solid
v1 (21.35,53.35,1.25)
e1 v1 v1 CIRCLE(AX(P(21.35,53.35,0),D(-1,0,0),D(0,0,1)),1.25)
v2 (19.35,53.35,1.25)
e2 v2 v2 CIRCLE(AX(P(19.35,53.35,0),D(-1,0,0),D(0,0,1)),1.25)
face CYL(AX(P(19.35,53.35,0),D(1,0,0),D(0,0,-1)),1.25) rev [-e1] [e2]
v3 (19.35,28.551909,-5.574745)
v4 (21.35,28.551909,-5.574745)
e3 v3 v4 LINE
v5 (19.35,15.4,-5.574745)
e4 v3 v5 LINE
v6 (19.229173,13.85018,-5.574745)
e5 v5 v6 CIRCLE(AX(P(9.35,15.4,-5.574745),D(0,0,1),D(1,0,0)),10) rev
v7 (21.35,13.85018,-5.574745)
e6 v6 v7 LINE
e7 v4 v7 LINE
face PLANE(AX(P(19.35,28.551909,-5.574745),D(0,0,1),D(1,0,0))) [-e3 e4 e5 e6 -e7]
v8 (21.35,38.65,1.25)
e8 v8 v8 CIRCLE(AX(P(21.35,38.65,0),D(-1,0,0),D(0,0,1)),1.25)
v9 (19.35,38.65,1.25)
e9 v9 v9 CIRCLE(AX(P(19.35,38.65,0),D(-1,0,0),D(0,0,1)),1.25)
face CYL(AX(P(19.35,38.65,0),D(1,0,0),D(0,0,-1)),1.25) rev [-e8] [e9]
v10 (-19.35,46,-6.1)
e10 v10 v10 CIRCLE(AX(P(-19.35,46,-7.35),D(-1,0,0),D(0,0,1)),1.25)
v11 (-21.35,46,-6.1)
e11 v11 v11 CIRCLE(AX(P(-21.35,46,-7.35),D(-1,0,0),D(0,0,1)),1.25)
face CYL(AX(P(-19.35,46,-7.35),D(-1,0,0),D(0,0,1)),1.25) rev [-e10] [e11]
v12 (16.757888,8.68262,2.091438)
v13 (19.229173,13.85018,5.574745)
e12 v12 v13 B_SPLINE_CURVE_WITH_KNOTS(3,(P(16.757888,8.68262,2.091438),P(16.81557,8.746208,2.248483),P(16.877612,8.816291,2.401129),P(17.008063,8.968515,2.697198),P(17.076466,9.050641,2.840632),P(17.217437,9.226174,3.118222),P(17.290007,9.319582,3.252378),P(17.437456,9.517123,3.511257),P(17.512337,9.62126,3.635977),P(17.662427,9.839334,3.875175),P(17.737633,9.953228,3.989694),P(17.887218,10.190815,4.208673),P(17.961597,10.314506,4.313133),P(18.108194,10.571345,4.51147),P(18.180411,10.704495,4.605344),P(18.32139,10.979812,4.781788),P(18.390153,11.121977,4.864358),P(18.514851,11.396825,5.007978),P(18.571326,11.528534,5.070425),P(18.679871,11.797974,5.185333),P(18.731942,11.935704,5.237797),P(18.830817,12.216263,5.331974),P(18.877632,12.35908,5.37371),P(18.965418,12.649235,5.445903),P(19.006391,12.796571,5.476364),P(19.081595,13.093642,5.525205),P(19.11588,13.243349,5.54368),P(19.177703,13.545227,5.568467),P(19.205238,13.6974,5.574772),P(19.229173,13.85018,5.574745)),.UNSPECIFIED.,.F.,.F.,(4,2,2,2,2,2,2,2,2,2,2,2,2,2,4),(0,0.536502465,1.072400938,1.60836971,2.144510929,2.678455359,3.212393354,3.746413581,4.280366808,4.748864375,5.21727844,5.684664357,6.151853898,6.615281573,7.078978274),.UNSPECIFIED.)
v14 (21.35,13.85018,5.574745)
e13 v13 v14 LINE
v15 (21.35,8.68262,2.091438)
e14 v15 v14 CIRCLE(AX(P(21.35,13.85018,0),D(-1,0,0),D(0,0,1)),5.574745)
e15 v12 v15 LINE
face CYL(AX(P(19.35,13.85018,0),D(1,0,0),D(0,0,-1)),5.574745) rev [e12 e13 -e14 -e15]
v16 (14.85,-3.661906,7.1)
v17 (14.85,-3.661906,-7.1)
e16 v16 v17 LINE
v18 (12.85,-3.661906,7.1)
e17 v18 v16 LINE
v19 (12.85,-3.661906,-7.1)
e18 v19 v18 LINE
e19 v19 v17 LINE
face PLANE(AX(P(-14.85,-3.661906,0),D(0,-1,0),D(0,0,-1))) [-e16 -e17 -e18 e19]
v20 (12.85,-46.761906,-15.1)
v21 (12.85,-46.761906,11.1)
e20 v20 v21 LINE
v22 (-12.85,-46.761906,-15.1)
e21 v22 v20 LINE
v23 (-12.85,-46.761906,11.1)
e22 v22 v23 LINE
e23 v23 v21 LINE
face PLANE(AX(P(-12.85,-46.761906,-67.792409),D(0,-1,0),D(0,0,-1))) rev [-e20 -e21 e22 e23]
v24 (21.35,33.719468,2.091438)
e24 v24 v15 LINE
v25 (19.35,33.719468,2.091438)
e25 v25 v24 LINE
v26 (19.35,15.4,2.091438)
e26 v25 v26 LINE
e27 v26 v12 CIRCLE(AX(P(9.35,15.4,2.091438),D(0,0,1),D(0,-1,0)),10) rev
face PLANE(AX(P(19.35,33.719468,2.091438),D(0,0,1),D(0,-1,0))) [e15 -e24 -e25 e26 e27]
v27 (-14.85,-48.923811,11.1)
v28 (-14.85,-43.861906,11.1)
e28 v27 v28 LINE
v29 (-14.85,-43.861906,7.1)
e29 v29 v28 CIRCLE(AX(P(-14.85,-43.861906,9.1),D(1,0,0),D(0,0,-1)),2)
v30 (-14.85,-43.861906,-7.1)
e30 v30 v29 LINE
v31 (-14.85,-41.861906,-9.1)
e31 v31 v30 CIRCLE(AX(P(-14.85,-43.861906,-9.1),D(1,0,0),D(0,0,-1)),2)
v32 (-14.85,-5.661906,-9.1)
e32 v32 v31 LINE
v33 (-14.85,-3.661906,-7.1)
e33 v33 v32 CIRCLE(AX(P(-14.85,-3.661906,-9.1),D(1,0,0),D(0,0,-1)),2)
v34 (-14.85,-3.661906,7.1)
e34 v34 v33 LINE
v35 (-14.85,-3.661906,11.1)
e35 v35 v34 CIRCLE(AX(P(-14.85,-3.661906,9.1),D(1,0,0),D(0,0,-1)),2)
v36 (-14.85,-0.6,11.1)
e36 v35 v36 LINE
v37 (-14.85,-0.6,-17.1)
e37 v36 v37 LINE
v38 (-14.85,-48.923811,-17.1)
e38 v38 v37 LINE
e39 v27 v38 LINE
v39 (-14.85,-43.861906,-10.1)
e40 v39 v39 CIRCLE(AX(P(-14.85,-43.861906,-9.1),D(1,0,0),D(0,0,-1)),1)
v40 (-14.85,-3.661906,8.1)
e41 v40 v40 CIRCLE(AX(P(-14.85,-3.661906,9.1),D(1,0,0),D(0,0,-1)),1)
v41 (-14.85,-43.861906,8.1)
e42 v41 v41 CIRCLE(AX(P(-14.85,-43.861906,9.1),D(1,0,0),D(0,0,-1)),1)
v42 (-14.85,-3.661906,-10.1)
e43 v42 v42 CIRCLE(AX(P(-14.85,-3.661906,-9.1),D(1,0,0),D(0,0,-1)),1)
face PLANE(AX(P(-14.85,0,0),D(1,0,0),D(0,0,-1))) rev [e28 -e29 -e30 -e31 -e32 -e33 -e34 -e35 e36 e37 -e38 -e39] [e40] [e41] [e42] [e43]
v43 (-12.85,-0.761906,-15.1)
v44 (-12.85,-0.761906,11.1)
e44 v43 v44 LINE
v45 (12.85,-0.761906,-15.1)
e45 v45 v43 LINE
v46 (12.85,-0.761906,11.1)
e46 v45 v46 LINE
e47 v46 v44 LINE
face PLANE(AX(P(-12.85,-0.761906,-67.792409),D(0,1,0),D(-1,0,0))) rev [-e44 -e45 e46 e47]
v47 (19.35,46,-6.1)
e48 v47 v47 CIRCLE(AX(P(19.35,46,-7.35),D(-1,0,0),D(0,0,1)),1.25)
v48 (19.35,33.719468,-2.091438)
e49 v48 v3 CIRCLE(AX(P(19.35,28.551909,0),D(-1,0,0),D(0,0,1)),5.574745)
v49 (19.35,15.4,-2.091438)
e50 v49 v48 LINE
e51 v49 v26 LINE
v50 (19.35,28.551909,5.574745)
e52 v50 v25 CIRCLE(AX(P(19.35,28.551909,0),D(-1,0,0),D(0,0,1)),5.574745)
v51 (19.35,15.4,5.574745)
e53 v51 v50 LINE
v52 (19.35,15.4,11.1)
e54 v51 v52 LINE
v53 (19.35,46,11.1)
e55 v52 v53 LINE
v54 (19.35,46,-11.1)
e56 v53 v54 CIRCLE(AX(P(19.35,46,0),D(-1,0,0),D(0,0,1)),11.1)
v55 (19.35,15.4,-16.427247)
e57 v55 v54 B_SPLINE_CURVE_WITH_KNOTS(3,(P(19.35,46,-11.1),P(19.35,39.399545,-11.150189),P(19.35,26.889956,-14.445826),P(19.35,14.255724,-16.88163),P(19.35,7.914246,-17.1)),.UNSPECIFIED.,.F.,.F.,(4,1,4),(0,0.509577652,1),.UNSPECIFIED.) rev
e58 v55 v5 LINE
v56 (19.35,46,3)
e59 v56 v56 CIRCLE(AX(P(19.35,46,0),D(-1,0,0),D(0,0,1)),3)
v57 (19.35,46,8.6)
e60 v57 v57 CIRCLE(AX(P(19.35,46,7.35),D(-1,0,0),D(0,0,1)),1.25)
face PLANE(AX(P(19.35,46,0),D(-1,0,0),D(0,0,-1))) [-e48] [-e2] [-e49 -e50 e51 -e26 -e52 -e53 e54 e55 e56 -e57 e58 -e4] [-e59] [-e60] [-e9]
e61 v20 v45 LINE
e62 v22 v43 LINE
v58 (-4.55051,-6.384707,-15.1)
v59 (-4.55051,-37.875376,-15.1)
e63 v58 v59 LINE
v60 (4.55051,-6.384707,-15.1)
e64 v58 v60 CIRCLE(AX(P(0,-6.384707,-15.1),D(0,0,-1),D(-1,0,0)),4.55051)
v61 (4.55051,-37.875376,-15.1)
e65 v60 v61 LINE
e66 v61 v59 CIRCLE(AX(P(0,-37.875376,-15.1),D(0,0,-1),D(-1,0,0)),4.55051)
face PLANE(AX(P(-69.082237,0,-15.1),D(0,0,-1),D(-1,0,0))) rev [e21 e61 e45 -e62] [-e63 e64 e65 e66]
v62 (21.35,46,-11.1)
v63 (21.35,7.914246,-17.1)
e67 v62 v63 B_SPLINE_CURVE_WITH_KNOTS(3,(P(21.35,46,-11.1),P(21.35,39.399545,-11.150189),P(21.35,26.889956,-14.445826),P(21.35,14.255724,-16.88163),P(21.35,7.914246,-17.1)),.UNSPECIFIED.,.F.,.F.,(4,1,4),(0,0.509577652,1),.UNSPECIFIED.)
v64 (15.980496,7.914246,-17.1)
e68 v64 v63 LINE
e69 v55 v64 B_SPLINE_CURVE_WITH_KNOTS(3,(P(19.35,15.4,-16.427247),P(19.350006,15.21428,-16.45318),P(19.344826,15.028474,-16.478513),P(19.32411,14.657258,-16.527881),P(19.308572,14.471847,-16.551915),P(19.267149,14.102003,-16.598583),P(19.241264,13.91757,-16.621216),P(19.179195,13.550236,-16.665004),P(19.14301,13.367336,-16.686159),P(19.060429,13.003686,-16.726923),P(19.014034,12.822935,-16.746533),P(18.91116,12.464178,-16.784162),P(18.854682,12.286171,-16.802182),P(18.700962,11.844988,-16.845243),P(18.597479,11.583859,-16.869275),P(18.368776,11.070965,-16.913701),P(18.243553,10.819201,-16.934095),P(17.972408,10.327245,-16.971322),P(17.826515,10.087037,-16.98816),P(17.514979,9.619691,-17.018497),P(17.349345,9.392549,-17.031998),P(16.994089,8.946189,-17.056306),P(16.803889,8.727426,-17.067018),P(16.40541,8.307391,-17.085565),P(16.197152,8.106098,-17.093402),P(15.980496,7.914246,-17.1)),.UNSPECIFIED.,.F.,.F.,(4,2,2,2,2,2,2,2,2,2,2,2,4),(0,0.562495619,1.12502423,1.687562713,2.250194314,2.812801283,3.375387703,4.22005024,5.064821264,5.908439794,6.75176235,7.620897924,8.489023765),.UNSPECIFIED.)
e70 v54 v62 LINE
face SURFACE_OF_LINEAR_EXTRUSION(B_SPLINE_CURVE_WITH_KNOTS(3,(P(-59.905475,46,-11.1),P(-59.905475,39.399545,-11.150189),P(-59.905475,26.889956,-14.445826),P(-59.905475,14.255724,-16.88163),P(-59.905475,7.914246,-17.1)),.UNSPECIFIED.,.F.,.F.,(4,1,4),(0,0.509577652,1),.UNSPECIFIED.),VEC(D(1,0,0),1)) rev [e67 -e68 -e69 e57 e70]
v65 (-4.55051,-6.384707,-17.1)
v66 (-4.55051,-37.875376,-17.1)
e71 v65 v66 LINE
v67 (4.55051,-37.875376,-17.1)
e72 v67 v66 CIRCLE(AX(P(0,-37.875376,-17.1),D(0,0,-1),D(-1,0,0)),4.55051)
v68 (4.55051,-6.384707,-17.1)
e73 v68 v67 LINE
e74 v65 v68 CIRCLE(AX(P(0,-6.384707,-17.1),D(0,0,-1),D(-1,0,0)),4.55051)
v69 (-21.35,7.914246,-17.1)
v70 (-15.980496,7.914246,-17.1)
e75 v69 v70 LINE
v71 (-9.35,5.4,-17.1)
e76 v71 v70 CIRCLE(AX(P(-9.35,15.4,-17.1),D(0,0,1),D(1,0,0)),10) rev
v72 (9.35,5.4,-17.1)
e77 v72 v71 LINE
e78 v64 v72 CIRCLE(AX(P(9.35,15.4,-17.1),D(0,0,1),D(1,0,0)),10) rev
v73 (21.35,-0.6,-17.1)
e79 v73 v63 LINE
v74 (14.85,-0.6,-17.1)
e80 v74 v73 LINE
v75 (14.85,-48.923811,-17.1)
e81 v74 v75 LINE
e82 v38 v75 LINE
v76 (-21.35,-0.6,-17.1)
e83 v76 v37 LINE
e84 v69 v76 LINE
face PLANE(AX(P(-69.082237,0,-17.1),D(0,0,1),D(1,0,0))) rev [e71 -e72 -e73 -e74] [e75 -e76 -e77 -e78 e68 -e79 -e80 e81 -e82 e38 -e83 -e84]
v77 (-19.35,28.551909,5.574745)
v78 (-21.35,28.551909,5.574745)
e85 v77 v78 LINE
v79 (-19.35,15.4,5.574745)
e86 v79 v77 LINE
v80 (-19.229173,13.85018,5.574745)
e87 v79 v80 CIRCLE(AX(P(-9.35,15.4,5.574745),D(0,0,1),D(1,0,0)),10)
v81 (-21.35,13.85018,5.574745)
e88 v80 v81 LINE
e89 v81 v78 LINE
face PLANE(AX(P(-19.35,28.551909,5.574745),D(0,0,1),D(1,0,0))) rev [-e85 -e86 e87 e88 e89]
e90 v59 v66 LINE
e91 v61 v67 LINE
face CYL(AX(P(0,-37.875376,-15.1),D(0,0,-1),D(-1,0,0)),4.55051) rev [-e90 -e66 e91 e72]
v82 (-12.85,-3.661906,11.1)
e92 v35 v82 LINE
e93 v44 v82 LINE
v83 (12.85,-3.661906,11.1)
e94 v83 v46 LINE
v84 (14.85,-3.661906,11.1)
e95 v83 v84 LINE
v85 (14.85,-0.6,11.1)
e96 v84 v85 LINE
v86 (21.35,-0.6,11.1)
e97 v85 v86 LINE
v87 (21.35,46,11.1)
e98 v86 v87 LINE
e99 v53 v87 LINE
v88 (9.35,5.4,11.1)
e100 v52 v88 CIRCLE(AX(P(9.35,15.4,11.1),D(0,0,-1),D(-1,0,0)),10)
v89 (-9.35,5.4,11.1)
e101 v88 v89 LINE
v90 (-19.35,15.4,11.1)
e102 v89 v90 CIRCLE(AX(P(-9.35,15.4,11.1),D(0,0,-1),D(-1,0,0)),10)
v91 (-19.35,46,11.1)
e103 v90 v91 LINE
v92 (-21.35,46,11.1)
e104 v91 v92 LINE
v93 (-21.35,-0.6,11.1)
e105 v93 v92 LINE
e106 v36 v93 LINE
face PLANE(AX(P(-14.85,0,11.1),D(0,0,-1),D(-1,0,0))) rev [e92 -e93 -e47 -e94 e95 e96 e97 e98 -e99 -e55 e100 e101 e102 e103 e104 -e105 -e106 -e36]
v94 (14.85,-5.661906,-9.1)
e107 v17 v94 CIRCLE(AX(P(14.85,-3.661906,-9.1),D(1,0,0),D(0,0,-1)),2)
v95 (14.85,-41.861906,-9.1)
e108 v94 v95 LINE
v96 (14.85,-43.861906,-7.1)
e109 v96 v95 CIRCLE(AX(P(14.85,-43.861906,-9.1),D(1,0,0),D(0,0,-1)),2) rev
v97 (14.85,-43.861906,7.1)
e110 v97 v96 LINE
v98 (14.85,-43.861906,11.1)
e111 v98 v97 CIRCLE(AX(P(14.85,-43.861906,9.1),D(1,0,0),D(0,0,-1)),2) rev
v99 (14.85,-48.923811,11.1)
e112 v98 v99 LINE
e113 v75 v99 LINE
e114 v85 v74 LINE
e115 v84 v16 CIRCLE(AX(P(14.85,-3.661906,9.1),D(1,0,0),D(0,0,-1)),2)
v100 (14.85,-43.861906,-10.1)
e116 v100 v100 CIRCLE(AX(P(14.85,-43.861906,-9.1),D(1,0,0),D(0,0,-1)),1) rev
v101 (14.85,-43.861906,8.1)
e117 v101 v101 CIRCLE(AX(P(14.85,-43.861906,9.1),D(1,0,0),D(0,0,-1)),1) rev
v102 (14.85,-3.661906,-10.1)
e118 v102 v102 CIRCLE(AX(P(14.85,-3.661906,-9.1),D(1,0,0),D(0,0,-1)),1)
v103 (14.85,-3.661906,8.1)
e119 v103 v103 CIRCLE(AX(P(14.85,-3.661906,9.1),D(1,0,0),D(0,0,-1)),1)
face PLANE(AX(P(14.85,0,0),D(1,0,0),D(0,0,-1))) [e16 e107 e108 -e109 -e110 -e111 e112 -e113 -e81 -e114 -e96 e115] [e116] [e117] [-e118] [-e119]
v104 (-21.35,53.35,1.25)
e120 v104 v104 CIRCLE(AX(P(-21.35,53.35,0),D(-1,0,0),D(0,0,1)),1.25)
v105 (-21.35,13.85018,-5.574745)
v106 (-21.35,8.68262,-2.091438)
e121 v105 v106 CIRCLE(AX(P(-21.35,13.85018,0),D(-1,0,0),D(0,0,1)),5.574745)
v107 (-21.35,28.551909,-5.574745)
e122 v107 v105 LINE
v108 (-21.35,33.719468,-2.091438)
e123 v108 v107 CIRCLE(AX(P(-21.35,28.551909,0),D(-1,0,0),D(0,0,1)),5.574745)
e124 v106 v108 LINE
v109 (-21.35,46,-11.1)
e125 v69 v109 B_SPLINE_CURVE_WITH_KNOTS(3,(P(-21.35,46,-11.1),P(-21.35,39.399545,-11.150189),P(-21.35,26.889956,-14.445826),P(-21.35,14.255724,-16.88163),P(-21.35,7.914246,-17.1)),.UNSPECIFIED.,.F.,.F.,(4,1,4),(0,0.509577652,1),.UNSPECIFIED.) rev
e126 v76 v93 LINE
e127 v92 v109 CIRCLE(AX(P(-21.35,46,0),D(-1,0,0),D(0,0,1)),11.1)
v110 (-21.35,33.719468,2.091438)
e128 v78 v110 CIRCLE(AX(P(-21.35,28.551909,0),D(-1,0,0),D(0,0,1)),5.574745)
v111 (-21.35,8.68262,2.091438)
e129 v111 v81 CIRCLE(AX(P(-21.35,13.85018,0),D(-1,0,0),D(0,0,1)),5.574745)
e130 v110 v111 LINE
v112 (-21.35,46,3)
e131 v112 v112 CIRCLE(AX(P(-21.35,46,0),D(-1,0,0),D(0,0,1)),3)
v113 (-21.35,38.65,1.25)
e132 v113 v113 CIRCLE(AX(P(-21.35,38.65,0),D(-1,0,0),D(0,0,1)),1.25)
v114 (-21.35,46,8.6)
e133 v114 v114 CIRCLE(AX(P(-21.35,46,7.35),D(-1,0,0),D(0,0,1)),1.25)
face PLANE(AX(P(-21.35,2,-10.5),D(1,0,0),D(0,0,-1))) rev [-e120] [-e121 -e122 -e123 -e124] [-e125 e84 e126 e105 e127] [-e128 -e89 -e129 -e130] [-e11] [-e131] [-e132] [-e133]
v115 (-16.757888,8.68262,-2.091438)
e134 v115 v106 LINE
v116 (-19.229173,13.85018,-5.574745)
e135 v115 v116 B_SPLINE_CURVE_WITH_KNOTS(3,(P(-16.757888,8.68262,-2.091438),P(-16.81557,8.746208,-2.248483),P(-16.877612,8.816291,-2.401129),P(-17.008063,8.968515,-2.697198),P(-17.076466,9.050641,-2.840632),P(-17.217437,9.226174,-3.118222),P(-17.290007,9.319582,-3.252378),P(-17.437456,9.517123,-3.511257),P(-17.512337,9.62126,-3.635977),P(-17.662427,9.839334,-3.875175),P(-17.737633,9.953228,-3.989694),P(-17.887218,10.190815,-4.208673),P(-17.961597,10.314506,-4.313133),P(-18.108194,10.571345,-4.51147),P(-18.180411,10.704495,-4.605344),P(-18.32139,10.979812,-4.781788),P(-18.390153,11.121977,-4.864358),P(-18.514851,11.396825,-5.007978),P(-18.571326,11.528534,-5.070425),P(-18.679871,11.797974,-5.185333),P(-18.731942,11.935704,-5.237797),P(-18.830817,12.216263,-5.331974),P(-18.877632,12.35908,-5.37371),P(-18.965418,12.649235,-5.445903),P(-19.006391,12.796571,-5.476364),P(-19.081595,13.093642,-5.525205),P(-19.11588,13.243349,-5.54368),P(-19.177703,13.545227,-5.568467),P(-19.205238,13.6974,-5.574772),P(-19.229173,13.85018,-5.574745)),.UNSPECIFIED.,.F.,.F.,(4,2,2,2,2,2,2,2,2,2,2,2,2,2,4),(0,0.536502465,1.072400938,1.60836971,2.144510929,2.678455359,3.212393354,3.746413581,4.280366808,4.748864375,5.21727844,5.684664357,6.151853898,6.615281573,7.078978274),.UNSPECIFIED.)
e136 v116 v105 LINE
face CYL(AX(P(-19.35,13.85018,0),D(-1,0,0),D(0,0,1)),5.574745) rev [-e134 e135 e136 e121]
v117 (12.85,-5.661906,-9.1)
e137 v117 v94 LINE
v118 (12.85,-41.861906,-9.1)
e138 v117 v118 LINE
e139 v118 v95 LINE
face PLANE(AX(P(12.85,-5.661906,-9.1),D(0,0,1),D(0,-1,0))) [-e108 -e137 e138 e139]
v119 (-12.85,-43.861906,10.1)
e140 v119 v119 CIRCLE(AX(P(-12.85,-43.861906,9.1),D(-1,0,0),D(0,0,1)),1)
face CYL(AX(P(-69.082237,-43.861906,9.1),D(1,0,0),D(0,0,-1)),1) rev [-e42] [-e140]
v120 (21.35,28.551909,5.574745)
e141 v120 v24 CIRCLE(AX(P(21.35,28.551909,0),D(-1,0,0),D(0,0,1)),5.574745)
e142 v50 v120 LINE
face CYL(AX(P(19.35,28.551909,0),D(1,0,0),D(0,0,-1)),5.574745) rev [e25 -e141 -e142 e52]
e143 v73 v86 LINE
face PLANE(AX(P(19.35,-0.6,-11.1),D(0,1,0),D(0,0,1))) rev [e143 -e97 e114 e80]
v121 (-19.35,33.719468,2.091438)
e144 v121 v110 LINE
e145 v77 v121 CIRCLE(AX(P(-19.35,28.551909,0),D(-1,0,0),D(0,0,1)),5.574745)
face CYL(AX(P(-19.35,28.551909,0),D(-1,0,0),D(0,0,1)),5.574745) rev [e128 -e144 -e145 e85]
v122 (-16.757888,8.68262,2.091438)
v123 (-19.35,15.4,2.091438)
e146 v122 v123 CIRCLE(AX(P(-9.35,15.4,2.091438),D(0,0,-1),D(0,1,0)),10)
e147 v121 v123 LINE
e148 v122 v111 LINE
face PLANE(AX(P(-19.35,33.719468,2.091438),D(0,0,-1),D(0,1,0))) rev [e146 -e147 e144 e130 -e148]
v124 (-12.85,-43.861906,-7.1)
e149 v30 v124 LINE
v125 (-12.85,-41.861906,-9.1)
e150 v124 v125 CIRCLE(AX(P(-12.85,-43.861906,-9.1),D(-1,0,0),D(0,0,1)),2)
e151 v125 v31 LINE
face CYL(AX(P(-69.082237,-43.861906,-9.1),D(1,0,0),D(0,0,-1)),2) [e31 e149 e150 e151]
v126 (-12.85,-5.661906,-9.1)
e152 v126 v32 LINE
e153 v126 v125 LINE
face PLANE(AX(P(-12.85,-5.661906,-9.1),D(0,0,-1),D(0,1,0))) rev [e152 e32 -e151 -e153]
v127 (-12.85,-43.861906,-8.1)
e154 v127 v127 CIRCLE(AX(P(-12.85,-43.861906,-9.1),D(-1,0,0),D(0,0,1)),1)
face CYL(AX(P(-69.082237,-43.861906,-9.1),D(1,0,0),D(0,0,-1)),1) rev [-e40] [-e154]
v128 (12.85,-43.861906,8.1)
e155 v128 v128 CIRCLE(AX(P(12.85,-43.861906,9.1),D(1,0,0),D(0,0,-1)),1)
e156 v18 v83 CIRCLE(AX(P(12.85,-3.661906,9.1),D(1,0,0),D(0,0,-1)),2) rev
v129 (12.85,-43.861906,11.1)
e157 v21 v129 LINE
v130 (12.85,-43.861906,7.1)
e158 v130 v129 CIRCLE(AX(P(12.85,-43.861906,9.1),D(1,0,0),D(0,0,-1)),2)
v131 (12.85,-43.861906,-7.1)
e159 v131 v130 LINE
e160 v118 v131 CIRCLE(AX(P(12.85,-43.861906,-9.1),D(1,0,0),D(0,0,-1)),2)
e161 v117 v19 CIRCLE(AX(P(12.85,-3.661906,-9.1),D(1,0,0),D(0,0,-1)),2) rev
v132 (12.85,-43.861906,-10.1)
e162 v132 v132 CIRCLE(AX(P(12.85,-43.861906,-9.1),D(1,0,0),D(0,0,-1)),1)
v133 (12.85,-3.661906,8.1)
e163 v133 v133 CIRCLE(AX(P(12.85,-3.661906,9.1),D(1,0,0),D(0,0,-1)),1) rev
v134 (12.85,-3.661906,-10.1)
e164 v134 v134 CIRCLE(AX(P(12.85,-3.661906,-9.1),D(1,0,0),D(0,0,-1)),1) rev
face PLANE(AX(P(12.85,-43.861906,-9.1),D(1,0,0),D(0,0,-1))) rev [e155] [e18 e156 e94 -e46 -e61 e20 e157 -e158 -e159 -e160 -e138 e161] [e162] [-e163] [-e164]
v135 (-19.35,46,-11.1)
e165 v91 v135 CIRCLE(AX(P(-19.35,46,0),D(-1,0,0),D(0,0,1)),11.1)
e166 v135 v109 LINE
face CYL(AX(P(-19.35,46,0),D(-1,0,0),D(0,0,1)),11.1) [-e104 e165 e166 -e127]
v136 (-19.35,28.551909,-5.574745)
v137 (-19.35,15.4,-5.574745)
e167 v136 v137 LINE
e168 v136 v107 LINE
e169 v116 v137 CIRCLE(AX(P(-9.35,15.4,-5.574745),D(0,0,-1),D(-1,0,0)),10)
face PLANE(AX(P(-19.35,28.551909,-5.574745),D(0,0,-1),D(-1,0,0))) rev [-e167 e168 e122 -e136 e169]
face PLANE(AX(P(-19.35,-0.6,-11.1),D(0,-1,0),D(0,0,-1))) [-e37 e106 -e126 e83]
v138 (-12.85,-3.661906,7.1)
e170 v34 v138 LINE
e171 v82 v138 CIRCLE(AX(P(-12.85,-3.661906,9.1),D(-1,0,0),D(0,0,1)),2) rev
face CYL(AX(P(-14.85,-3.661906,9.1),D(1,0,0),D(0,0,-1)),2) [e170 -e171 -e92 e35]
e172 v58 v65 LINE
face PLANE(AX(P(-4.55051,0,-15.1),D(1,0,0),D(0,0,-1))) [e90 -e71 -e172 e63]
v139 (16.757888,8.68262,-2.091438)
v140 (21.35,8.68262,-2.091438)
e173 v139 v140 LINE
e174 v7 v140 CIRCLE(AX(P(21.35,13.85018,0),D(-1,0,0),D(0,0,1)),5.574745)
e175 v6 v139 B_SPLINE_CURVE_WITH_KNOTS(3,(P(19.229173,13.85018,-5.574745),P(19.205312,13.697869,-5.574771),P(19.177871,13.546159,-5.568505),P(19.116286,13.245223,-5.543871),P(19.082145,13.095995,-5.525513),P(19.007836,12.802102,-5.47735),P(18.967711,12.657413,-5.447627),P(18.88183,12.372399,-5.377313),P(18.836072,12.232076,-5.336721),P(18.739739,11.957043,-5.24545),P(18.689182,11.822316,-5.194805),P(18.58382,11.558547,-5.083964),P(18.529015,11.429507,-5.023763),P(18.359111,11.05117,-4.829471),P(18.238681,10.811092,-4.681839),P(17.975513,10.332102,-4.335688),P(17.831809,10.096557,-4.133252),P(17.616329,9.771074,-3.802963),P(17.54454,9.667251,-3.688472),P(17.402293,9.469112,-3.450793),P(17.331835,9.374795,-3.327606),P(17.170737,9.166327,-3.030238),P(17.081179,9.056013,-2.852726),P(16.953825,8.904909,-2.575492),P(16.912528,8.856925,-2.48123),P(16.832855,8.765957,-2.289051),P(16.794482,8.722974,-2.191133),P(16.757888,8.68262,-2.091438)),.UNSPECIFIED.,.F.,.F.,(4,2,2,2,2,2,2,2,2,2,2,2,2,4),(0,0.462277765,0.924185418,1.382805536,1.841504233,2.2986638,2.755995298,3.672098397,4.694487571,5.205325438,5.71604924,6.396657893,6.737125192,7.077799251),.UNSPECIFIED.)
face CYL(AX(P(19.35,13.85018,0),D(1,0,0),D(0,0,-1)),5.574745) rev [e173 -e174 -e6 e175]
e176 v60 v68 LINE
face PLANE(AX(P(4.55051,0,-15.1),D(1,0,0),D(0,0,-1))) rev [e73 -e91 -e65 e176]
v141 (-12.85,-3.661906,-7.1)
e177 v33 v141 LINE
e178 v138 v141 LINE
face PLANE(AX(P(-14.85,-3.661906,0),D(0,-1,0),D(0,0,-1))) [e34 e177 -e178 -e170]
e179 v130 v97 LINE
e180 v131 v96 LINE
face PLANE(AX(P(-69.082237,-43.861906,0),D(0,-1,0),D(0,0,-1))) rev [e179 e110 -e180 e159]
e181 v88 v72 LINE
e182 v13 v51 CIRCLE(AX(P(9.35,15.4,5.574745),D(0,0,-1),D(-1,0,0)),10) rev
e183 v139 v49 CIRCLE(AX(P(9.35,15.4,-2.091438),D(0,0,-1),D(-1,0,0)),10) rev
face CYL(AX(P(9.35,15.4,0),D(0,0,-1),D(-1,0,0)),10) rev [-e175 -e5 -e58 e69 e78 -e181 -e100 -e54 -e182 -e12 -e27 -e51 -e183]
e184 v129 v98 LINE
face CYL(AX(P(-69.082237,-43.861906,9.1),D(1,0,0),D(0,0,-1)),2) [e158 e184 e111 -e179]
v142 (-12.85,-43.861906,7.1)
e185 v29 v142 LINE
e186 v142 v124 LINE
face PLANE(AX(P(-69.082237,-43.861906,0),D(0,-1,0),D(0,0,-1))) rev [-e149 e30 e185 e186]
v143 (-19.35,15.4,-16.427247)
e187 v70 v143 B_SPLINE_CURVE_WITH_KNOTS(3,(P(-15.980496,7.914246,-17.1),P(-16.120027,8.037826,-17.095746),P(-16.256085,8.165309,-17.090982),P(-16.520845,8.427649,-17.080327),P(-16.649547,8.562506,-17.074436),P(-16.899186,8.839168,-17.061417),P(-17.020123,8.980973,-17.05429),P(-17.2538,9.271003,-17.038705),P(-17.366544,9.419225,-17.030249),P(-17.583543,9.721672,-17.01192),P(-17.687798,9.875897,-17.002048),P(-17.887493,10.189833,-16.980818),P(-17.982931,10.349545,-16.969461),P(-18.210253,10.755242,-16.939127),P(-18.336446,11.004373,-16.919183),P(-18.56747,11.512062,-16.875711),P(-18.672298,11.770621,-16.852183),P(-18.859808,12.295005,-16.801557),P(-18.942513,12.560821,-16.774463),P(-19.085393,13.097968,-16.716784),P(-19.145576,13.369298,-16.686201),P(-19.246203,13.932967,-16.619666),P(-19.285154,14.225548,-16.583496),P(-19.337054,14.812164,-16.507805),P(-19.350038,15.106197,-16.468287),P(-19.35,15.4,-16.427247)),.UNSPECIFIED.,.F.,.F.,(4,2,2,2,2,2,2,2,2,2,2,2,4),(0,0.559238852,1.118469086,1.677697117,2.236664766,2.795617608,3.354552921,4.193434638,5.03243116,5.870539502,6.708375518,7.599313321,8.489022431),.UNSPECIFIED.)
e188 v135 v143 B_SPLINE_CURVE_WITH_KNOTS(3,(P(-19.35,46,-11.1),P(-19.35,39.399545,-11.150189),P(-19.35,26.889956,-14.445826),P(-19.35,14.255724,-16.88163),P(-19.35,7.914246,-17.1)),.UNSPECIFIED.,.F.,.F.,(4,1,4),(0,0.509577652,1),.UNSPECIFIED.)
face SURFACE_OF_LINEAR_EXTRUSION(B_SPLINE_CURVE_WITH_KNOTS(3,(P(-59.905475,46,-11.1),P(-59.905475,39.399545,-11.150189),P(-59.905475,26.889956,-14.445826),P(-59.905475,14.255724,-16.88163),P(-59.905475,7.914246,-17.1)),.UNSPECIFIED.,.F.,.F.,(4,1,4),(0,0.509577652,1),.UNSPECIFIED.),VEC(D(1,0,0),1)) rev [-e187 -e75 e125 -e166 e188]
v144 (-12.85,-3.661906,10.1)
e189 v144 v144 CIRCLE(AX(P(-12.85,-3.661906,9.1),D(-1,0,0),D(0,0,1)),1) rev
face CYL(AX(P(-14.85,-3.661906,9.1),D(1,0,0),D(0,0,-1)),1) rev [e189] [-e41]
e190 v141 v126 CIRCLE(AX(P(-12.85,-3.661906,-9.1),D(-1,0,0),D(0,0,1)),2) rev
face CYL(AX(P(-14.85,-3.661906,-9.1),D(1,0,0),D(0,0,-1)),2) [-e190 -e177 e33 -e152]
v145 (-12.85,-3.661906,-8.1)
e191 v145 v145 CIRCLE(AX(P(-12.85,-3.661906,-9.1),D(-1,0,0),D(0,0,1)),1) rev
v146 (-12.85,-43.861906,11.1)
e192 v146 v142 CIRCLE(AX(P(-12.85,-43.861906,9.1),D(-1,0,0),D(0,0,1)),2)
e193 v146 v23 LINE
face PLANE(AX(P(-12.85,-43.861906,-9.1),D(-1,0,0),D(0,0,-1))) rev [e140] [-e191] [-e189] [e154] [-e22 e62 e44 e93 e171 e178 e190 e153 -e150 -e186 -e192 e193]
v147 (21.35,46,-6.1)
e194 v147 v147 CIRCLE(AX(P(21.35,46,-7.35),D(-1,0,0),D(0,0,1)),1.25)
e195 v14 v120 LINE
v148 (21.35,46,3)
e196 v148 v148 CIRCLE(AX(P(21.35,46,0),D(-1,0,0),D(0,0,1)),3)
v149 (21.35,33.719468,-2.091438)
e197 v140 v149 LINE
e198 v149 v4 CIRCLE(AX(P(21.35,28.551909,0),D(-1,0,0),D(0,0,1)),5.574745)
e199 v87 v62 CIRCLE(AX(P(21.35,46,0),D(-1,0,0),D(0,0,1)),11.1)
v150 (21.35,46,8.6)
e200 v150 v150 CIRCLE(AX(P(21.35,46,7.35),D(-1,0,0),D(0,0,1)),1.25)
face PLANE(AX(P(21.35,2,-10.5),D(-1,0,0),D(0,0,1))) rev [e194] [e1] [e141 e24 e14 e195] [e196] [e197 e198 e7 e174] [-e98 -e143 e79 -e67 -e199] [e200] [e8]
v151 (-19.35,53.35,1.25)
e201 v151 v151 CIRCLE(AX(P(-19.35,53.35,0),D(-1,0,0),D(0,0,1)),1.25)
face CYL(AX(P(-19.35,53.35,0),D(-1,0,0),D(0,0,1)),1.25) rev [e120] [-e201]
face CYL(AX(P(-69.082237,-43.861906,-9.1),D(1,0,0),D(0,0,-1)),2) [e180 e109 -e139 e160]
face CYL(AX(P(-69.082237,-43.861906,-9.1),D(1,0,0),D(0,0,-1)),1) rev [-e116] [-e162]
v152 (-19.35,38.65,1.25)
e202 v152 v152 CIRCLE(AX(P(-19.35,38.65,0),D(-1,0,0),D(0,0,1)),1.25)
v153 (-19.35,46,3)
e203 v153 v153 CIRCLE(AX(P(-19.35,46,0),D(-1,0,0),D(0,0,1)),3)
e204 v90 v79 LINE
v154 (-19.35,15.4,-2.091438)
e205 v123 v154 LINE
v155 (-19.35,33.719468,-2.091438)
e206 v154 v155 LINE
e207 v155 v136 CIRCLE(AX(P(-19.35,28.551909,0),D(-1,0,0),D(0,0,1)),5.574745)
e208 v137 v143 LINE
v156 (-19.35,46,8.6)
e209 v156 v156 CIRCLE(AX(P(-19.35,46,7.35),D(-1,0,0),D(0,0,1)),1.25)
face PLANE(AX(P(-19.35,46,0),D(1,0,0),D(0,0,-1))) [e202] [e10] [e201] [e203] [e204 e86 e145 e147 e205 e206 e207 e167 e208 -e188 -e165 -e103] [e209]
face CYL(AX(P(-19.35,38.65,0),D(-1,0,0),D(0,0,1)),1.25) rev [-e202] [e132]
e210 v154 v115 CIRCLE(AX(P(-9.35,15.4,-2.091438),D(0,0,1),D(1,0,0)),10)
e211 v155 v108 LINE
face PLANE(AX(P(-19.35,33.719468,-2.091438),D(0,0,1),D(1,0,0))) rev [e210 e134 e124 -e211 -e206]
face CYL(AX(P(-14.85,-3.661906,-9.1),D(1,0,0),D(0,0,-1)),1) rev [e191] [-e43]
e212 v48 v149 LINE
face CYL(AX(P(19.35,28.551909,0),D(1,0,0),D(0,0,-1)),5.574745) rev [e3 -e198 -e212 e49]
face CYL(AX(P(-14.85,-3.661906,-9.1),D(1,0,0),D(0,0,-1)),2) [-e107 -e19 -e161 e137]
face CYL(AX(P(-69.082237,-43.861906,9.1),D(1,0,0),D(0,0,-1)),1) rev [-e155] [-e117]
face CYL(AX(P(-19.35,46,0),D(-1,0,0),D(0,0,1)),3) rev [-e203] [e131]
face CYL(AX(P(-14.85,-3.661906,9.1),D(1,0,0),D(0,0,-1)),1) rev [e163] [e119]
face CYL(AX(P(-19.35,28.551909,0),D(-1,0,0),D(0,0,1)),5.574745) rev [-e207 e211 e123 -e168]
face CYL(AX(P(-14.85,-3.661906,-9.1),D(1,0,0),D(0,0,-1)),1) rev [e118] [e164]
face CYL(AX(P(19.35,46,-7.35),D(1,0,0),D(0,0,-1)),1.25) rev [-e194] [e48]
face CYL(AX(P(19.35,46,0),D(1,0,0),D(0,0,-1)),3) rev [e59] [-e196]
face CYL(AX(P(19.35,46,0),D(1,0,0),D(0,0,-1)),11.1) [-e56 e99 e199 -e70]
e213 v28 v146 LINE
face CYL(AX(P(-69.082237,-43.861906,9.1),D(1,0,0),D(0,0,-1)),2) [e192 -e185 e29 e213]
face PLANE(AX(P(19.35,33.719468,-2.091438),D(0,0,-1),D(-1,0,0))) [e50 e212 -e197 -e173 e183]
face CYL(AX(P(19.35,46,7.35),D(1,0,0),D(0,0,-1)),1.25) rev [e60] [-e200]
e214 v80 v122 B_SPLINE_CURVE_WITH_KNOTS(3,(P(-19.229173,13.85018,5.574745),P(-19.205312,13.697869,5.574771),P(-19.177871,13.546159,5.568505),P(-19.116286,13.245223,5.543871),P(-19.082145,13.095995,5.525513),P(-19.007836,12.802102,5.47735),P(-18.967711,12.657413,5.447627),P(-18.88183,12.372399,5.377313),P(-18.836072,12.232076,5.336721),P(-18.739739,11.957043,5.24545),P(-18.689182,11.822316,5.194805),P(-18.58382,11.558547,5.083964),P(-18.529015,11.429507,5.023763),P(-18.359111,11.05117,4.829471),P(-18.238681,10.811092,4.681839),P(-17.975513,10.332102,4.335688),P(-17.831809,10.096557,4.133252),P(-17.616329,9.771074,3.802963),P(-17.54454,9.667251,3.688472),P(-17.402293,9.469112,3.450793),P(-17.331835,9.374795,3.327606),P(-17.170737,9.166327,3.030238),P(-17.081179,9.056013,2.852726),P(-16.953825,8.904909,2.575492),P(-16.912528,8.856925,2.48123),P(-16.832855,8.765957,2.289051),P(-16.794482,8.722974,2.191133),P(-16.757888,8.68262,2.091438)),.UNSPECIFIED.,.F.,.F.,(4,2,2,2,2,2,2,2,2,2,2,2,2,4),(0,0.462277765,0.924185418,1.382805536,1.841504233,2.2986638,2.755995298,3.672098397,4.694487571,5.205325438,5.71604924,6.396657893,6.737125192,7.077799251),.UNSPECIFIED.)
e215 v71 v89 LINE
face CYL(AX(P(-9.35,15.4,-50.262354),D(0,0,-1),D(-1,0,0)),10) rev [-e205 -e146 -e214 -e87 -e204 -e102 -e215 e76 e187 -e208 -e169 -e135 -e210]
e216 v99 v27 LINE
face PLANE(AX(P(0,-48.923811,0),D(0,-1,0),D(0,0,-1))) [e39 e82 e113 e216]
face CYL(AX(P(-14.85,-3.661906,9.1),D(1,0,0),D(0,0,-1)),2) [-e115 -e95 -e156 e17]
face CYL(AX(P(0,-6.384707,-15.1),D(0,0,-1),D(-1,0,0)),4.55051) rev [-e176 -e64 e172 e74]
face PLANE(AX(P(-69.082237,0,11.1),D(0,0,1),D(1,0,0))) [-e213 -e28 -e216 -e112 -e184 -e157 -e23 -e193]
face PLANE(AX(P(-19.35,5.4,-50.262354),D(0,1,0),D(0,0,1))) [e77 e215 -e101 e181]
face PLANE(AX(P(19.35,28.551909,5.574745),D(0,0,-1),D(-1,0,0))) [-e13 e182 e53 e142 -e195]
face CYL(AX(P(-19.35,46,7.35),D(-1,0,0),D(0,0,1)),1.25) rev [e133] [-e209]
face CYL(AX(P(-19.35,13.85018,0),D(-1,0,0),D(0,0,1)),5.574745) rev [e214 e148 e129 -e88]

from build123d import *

# Parameters (mm, degrees)
SKETCH_1_W           = 42.7
SKETCH_1_H           = 21
SKETCH_1_R           = 1.5
EXTRUDE_1_DEPTH      = 2
SKETCH_2_R           = 1.25
SKETCH_2_R_2         = 3
EXTRUDE_2_DEPTH      = 2
EXTRUDE_3_DEPTH      = 14.85
EXTRUDE_3_DEPTH_BACK = 14.85
SKETCH_3_R           = 1
SKETCH_4_R           = 1.25
SKETCH_4_R_2         = 3
EXTRUDE_5_DEPTH      = 2
SKETCH_5_W           = 38.7
SKETCH_5_H           = 6
EXTRUDE_7_DEPTH      = 22.2
FILLET_START         = -11.1
FILLET_1_DEPTH       = 22.2
FILLET_START_2       = -19.35
FILLET_1_2_DEPTH     = 38.7
SKETCH_7_R           = 1
EXTRUDE_9_DEPTH      = 29.7
EXTRUDE_10_DEPTH     = 2
CUT_EXTRUDE_2_DEPTH  = 26.2
SKETCH_10_W          = 29.7
SKETCH_10_H          = 28.2
EXTRUDE_11_DEPTH     = 2
EXTRUDE_START        = 6
EXTRUDE_12_DEPTH     = 6
CUT_EXTRUDE_START    = -42.7
CUT_EXTRUDE_3_DEPTH  = 42.7
CUT_EXTRUDE_4_DEPTH  = 2


with BuildPart() as part:
    # 草图1 → 凸台-拉伸1 (new body)
    with BuildSketch(Plane(origin=(0, 0, 0), x_dir=(1, 0, 0), z_dir=(0, 1, 0))):
        Rectangle(SKETCH_1_W, SKETCH_1_H)
        with Locations(Location((7.5, 5, 0), (0, 0, 270))):
            Circle(SKETCH_1_R, mode=Mode.SUBTRACT)
        with Locations(Location((7.5, -5, 0), (0, 0, 90))):
            Circle(SKETCH_1_R, mode=Mode.SUBTRACT)
        with Locations(Location((-7.5, -5, 0), (0, 0, 270))):
            Circle(SKETCH_1_R, mode=Mode.SUBTRACT)
        with Locations(Location((-7.5, 5, 0), (0, 0, 90))):
            Circle(SKETCH_1_R, mode=Mode.SUBTRACT)
        with BuildLine():
            Line((8.017950723, 1.550908082), (12.912587519, 1.550908082))
            ThreePointArc((12.912587519, 1.550908082), (14.126270768, 1.145131224), (14.697546856, 0))
            ThreePointArc((14.697546856, 0), (14.126270768, -1.145131224), (12.912587519, -1.550908082))
            Line((12.912587519, -1.550908082), (8.017950723, -1.550908082))
            add(Edge.make_bspline(
                [(0, -7.407271614), (2.092471107, -7.358009404), (3.043739342, -2.951912586), (6.007732496, -1.626733157), (8.017950723, -1.550908082)],
                knots=[0, 0, 0, 0, 0.496822763, 1, 1, 1, 1], degree=3))
            add(Edge.make_bspline(
                [(0, -7.407271614), (-2.092471107, -7.358009404), (-3.043739342, -2.951912586), (-6.007732496, -1.626733157), (-8.017950723, -1.550908082)],
                knots=[0, 0, 0, 0, 0.496822763, 1, 1, 1, 1], degree=3))
            Line((-8.017950723, -1.550908082), (-12.912587519, -1.550908082))
            ThreePointArc((-12.912587519, -1.550908082), (-14.126270768, -1.145131224), (-14.697546856, 0))
            ThreePointArc((-14.697546856, 0), (-14.126270768, 1.145131224), (-12.912587519, 1.550908082))
            Line((-12.912587519, 1.550908082), (-8.017950723, 1.550908082))
            add(Edge.make_bspline(
                [(0, 7.407271614), (-2.092471107, 7.358009404), (-3.043739342, 2.951912586), (-6.007732496, 1.626733157), (-8.017950723, 1.550908082)],
                knots=[0, 0, 0, 0, 0.496822763, 1, 1, 1, 1], degree=3))
            add(Edge.make_bspline(
                [(0, 7.407271614), (2.092471107, 7.358009404), (3.043739342, 2.951912586), (6.007732496, 1.626733157), (8.017950723, 1.550908082)],
                knots=[0, 0, 0, 0, 0.496822763, 1, 1, 1, 1], degree=3))
        make_face(mode=Mode.SUBTRACT)
    extrude(amount=EXTRUDE_1_DEPTH)

    # 草图2 → 凸台-拉伸2 (add)
    with BuildSketch(Plane.ZY.offset(21.35)):
        with BuildLine():
            Line((-10.5, 2), (-10.5, 46))
            ThreePointArc((-10.5, 46), (0, 56.5), (10.5, 46))
            Line((10.5, 46), (10.5, 2))
            Line((10.5, 2), (-10.5, 2))
        make_face()
        with Locations((0, 38.65)):
            Circle(SKETCH_2_R, mode=Mode.SUBTRACT)
        with Locations((-7.35, 46)):
            Circle(SKETCH_2_R, mode=Mode.SUBTRACT)
        with Locations((0, 53.35)):
            Circle(SKETCH_2_R, mode=Mode.SUBTRACT)
        with Locations((7.35, 46)):
            Circle(SKETCH_2_R, mode=Mode.SUBTRACT)
        with Locations((0, 46)):
            Circle(SKETCH_2_R_2, mode=Mode.SUBTRACT)
        with BuildLine():
            Line((-2.091438456, 33.71946821), (-2.091438456, 8.682620376))
            ThreePointArc((-2.091438456, 8.682620376), (-4.622608783, 10.734209017), (-5.574745456, 13.850179963))
            Line((-5.574745456, 13.850179963), (-5.574745456, 28.551908623))
            ThreePointArc((-5.574745456, 28.551908623), (-4.622608783, 31.667879569), (-2.091438456, 33.71946821))
        make_face(mode=Mode.SUBTRACT)
        with BuildLine():
            Line((5.574745456, 28.551908623), (5.574745456, 13.850179963))
            ThreePointArc((5.574745456, 13.850179963), (4.622608783, 10.734209017), (2.091438456, 8.682620376))
            Line((2.091438456, 8.682620376), (2.091438456, 33.71946821))
            ThreePointArc((2.091438456, 33.71946821), (4.622608783, 31.667879569), (5.574745456, 28.551908623))
        make_face(mode=Mode.SUBTRACT)
    extrude_2 = extrude(amount=-EXTRUDE_2_DEPTH)

    # 镜向1: 凸台-拉伸2 across plane
    add(extrude_2.mirror(Plane(origin=(0, 0, 0), x_dir=(0, 0, 1), z_dir=(1, 0, 0))))

    # 草图3 → 凸台-拉伸3 (add, two sides: drawn at the far end of the back side and taken through both)
    # profile 1 of 2: a face of its own
    with BuildSketch(Plane(origin=(0, 0, 0), x_dir=(0, 0, -1), z_dir=(1, 0, 0)).offset(-EXTRUDE_3_DEPTH_BACK)):
        with BuildLine():
            Line((0, -3.661905735), (0, 0))
            Line((0, 0), (-11.1, 0))
            Line((-11.1, 0), (-11.1, -3.661905735))
            ThreePointArc((-11.1, -3.661905735), (-9.1, -5.661905735), (-7.1, -3.661905735))
            Line((-7.1, -3.661905735), (0, -3.661905735))
        make_face()
        with Locations((-9.1, -3.661905735)):
            Circle(SKETCH_3_R, mode=Mode.SUBTRACT)
    # profile 2 of 2: a face of its own
    with BuildSketch(Plane(origin=(0, 0, 0), x_dir=(0, 0, -1), z_dir=(1, 0, 0)).offset(-EXTRUDE_3_DEPTH_BACK)):
        with BuildLine():
            Line((11.1, 0), (0, 0))
            Line((0, 0), (0, -3.661905735))
            Line((0, -3.661905735), (7.1, -3.661905735))
            ThreePointArc((7.1, -3.661905735), (9.1, -5.661905735), (11.1, -3.661905735))
            Line((11.1, -3.661905735), (11.1, 0))
        make_face()
        with Locations((9.1, -3.661905735)):
            Circle(SKETCH_3_R, mode=Mode.SUBTRACT)
    extrude(amount=EXTRUDE_3_DEPTH + EXTRUDE_3_DEPTH_BACK)

    # 草图4 → 凸台-拉伸5 (add)
    with BuildSketch(Plane.ZY.offset(21.35)):
        with BuildLine():
            Line((-11.1, -0.6), (11.1, -0.6))
            Line((11.1, -0.6), (11.1, 46))
            ThreePointArc((11.1, 46), (0, 57.1), (-11.1, 46))
            Line((-11.1, 46), (-11.1, -0.6))
        make_face()
        with Locations((-7.35, 46)):
            Circle(SKETCH_4_R, mode=Mode.SUBTRACT)
        with Locations((0, 53.35)):
            Circle(SKETCH_4_R, mode=Mode.SUBTRACT)
        with Locations((7.35, 46)):
            Circle(SKETCH_4_R, mode=Mode.SUBTRACT)
        with Locations((0, 38.65)):
            Circle(SKETCH_4_R, mode=Mode.SUBTRACT)
        with Locations((0, 46)):
            Circle(SKETCH_4_R_2, mode=Mode.SUBTRACT)
        with BuildLine():
            Line((-5.574745456, 28.551908623), (-5.574745456, 13.850179963))
            ThreePointArc((-5.574745456, 13.850179963), (-4.622608783, 10.734209017), (-2.091438456, 8.682620376))
            Line((-2.091438456, 8.682620376), (-2.091438456, 33.71946821))
            ThreePointArc((-2.091438456, 33.71946821), (-4.622608783, 31.667879569), (-5.574745456, 28.551908623))
        make_face(mode=Mode.SUBTRACT)
        with BuildLine():
            Line((5.574745456, 13.850179963), (5.574745456, 28.551908623))
            ThreePointArc((5.574745456, 28.551908623), (4.622608783, 31.667879569), (2.091438456, 33.71946821))
            Line((2.091438456, 33.71946821), (2.091438456, 8.682620376))
            ThreePointArc((2.091438456, 8.682620376), (4.622608783, 10.734209017), (5.574745456, 13.850179963))
        make_face(mode=Mode.SUBTRACT)
    extrude_5 = extrude(amount=-EXTRUDE_5_DEPTH)

    # 镜向2: 凸台-拉伸5 across plane
    add(extrude_5.mirror(Plane(origin=(0, 0, 0), x_dir=(0, 0, 1), z_dir=(1, 0, 0))))

    # 草图5 → 凸台-拉伸7 (add)
    with BuildSketch(Plane.XY.offset(11.1)):
        with Locations((0, 2.4)):
            Rectangle(SKETCH_5_W, SKETCH_5_H)
    extrude(amount=-EXTRUDE_7_DEPTH)

    # 圆角1: read off the stored shape, not the designer's step
    # 圆角1 outline → 圆角1 (add)
    with BuildSketch(Plane.XY.offset(FILLET_START)):
        with BuildLine():
            Line((19.35, 5.4), (19.35, 15.4))
            ThreePointArc((19.35, 15.4), (16.421067812, 8.328932188), (9.35, 5.4))
            Line((9.35, 5.4), (19.35, 5.4))
        make_face()
        with BuildLine():
            Line((-19.35, 5.4), (-9.35, 5.4))
            ThreePointArc((-9.35, 5.4), (-16.421067812, 8.328932188), (-19.35, 15.4))
            Line((-19.35, 15.4), (-19.35, 5.4))
        make_face()
    extrude(amount=FILLET_1_DEPTH)

    # Fillet 1 2 outline → Fillet 1 2 (cut)
    with BuildSketch(Plane.YZ.offset(FILLET_START_2)):
        with BuildLine():
            Line((13.850179963, -5.574745456), (15.4, -5.574745456))
            Line((15.4, -5.574745456), (15.4, -2.091438456))
            Line((15.4, -2.091438456), (8.682620376, -2.091438456))
            ThreePointArc((8.682620376, -2.091438456), (10.734209017, -4.622608783), (13.850179963, -5.574745456))
        make_face()
        with BuildLine():
            Line((15.4, 2.091438456), (15.4, 5.574745456))
            Line((15.4, 5.574745456), (13.850179963, 5.574745456))
            ThreePointArc((13.850179963, 5.574745456), (10.734209017, 4.622608783), (8.682620376, 2.091438456))
            Line((8.682620376, 2.091438456), (15.4, 2.091438456))
        make_face()
    extrude(amount=FILLET_1_2_DEPTH, mode=Mode.SUBTRACT)

    # 草图7 → 凸台-拉伸9 (add)
    # profile 1 of 2: a face of its own
    with BuildSketch(Plane(origin=(14.85, 0, 0), x_dir=(0, 0, -1), z_dir=(1, 0, 0))):
        Polygon((15.1, -3.661905735), (11.1, -3.661905735), (11.1, -0.6), (17.1, -0.6), (17.1, -3.661905735), (17.1, -43.861905735), (17.1, -46.92381147), (11.1, -46.92381147), (11.1, -43.861905735), (15.1, -43.861905735), align=None)
    # profile 2 of 2: a face of its own
    with BuildSketch(Plane(origin=(14.85, 0, 0), x_dir=(0, 0, -1), z_dir=(1, 0, 0))):
        with BuildLine():
            ThreePointArc((-11.1, -43.861905735), (-9.1, -41.861905735), (-7.1, -43.861905735))
            Line((-7.1, -43.861905735), (7.1, -43.861905735))
            ThreePointArc((7.1, -43.861905735), (9.1, -41.861905735), (11.1, -43.861905735))
            Line((11.1, -43.861905735), (11.1, -46.92381147))
            Line((11.1, -46.92381147), (-11.1, -46.92381147))
            Line((-11.1, -46.92381147), (-11.1, -43.861905735))
        make_face()
        with Locations((9.1, -43.861905735)):
            Circle(SKETCH_7_R, mode=Mode.SUBTRACT)
        with Locations((-9.1, -43.861905735)):
            Circle(SKETCH_7_R, mode=Mode.SUBTRACT)
    extrude(amount=-EXTRUDE_9_DEPTH)

    # 草图8 → 凸台-拉伸10 (add)
    with BuildSketch(Plane(origin=(14.85, 0, 0), x_dir=(0, 0, -1), z_dir=(1, 0, 0))):
        with BuildLine():
            Line((15.1, -43.861905735), (11.1, -43.861905735))
            ThreePointArc((11.1, -43.861905735), (10.514213562, -42.447692173), (9.1, -41.861905735))
            Line((9.1, -41.861905735), (9.1, -5.661905735))
            ThreePointArc((9.1, -5.661905735), (10.514213562, -5.076119297), (11.1, -3.661905735))
            Line((11.1, -3.661905735), (15.1, -3.661905735))
            Line((15.1, -3.661905735), (15.1, -43.861905735))
        make_face()
    extrude_10 = extrude(amount=-EXTRUDE_10_DEPTH)

    # 镜向3: 凸台-拉伸10 across plane
    add(extrude_10.mirror(Plane(origin=(0, 0, 0), x_dir=(0, 0, 1), z_dir=(1, 0, 0))))

    # 草图9 → 切除-拉伸2 (cut)
    with BuildSketch(Plane.XY.offset(11.1)):
        Polygon((-12.85, -3.661905735), (-12.85, -0.761905735), (12.85, -0.761905735), (12.85, -3.661905735), (12.85, -43.861905735), (12.85, -46.761905735), (-12.85, -46.761905735), (-12.85, -43.861905735), align=None)
    extrude(amount=-CUT_EXTRUDE_2_DEPTH, mode=Mode.SUBTRACT)

    # 草图10 → 凸台-拉伸11 (add)
    with BuildSketch(Plane.XZ.offset(46.92381147)):
        with Locations((0, -3)):
            Rectangle(SKETCH_10_W, SKETCH_10_H)
    extrude(amount=EXTRUDE_11_DEPTH)

    # 草图11 → 凸台-拉伸12 (add)
    with BuildSketch(Plane(origin=(0, 0, -11.1), x_dir=(-1, 0, 0), z_dir=(0, 0, -1)).offset(EXTRUDE_START)):
        with BuildLine():
            Line((-21.35, -0.6), (-14.85, -0.6))
            Line((-14.85, -0.6), (14.85, -0.6))
            Line((14.85, -0.6), (21.35, -0.6))
            Line((21.35, -0.6), (21.35, 46))
            Line((21.35, 46), (19.35, 46))
            Line((19.35, 46), (19.35, 15.4))
            ThreePointArc((19.35, 15.4), (16.421067812, 8.328932188), (9.35, 5.4))
            Line((9.35, 5.4), (-9.35, 5.4))
            ThreePointArc((-9.35, 5.4), (-16.421067812, 8.328932188), (-19.35, 15.4))
            Line((-19.35, 15.4), (-19.35, 46))
            Line((-19.35, 46), (-21.35, 46))
            Line((-21.35, 46), (-21.35, -0.6))
        make_face()
    extrude(amount=-EXTRUDE_12_DEPTH)

    # 草图12 → 切除-拉伸3 (cut)
    with BuildSketch(Plane(origin=(21.35, 0, 0), x_dir=(0, 0, -1), z_dir=(1, 0, 0)).offset(CUT_EXTRUDE_START)):
        with BuildLine():
            Line((11.1, 46), (17.1, 46))
            Line((17.1, 46), (17.1, 7.914245737))
            add(Edge.make_bspline(
                [(11.1, 46), (11.150188541, 39.399545251), (14.445826352, 26.889956336), (16.881629906, 14.255723619), (17.1, 7.914245737)],
                knots=[0, 0, 0, 0, 0.509577652, 1, 1, 1, 1], degree=3))
        make_face()
    extrude(amount=CUT_EXTRUDE_3_DEPTH, mode=Mode.SUBTRACT)

    # 草图13 → 切除-拉伸4 (cut)
    with BuildSketch(Plane(origin=(0, 0, -17.1), x_dir=(-1, 0, 0), z_dir=(0, 0, -1))):
        with BuildLine():
            Line((4.550510282, -6.384707406), (4.550510282, -37.875376222))
            ThreePointArc((4.550510282, -37.875376222), (0, -42.425886504), (-4.550510282, -37.875376222))
            Line((-4.550510282, -37.875376222), (-4.550510282, -6.384707406))
            ThreePointArc((-4.550510282, -6.384707406), (0, -1.834197123), (4.550510282, -6.384707406))
        make_face()
    extrude(amount=-CUT_EXTRUDE_4_DEPTH, mode=Mode.SUBTRACT)


solid = part.part
